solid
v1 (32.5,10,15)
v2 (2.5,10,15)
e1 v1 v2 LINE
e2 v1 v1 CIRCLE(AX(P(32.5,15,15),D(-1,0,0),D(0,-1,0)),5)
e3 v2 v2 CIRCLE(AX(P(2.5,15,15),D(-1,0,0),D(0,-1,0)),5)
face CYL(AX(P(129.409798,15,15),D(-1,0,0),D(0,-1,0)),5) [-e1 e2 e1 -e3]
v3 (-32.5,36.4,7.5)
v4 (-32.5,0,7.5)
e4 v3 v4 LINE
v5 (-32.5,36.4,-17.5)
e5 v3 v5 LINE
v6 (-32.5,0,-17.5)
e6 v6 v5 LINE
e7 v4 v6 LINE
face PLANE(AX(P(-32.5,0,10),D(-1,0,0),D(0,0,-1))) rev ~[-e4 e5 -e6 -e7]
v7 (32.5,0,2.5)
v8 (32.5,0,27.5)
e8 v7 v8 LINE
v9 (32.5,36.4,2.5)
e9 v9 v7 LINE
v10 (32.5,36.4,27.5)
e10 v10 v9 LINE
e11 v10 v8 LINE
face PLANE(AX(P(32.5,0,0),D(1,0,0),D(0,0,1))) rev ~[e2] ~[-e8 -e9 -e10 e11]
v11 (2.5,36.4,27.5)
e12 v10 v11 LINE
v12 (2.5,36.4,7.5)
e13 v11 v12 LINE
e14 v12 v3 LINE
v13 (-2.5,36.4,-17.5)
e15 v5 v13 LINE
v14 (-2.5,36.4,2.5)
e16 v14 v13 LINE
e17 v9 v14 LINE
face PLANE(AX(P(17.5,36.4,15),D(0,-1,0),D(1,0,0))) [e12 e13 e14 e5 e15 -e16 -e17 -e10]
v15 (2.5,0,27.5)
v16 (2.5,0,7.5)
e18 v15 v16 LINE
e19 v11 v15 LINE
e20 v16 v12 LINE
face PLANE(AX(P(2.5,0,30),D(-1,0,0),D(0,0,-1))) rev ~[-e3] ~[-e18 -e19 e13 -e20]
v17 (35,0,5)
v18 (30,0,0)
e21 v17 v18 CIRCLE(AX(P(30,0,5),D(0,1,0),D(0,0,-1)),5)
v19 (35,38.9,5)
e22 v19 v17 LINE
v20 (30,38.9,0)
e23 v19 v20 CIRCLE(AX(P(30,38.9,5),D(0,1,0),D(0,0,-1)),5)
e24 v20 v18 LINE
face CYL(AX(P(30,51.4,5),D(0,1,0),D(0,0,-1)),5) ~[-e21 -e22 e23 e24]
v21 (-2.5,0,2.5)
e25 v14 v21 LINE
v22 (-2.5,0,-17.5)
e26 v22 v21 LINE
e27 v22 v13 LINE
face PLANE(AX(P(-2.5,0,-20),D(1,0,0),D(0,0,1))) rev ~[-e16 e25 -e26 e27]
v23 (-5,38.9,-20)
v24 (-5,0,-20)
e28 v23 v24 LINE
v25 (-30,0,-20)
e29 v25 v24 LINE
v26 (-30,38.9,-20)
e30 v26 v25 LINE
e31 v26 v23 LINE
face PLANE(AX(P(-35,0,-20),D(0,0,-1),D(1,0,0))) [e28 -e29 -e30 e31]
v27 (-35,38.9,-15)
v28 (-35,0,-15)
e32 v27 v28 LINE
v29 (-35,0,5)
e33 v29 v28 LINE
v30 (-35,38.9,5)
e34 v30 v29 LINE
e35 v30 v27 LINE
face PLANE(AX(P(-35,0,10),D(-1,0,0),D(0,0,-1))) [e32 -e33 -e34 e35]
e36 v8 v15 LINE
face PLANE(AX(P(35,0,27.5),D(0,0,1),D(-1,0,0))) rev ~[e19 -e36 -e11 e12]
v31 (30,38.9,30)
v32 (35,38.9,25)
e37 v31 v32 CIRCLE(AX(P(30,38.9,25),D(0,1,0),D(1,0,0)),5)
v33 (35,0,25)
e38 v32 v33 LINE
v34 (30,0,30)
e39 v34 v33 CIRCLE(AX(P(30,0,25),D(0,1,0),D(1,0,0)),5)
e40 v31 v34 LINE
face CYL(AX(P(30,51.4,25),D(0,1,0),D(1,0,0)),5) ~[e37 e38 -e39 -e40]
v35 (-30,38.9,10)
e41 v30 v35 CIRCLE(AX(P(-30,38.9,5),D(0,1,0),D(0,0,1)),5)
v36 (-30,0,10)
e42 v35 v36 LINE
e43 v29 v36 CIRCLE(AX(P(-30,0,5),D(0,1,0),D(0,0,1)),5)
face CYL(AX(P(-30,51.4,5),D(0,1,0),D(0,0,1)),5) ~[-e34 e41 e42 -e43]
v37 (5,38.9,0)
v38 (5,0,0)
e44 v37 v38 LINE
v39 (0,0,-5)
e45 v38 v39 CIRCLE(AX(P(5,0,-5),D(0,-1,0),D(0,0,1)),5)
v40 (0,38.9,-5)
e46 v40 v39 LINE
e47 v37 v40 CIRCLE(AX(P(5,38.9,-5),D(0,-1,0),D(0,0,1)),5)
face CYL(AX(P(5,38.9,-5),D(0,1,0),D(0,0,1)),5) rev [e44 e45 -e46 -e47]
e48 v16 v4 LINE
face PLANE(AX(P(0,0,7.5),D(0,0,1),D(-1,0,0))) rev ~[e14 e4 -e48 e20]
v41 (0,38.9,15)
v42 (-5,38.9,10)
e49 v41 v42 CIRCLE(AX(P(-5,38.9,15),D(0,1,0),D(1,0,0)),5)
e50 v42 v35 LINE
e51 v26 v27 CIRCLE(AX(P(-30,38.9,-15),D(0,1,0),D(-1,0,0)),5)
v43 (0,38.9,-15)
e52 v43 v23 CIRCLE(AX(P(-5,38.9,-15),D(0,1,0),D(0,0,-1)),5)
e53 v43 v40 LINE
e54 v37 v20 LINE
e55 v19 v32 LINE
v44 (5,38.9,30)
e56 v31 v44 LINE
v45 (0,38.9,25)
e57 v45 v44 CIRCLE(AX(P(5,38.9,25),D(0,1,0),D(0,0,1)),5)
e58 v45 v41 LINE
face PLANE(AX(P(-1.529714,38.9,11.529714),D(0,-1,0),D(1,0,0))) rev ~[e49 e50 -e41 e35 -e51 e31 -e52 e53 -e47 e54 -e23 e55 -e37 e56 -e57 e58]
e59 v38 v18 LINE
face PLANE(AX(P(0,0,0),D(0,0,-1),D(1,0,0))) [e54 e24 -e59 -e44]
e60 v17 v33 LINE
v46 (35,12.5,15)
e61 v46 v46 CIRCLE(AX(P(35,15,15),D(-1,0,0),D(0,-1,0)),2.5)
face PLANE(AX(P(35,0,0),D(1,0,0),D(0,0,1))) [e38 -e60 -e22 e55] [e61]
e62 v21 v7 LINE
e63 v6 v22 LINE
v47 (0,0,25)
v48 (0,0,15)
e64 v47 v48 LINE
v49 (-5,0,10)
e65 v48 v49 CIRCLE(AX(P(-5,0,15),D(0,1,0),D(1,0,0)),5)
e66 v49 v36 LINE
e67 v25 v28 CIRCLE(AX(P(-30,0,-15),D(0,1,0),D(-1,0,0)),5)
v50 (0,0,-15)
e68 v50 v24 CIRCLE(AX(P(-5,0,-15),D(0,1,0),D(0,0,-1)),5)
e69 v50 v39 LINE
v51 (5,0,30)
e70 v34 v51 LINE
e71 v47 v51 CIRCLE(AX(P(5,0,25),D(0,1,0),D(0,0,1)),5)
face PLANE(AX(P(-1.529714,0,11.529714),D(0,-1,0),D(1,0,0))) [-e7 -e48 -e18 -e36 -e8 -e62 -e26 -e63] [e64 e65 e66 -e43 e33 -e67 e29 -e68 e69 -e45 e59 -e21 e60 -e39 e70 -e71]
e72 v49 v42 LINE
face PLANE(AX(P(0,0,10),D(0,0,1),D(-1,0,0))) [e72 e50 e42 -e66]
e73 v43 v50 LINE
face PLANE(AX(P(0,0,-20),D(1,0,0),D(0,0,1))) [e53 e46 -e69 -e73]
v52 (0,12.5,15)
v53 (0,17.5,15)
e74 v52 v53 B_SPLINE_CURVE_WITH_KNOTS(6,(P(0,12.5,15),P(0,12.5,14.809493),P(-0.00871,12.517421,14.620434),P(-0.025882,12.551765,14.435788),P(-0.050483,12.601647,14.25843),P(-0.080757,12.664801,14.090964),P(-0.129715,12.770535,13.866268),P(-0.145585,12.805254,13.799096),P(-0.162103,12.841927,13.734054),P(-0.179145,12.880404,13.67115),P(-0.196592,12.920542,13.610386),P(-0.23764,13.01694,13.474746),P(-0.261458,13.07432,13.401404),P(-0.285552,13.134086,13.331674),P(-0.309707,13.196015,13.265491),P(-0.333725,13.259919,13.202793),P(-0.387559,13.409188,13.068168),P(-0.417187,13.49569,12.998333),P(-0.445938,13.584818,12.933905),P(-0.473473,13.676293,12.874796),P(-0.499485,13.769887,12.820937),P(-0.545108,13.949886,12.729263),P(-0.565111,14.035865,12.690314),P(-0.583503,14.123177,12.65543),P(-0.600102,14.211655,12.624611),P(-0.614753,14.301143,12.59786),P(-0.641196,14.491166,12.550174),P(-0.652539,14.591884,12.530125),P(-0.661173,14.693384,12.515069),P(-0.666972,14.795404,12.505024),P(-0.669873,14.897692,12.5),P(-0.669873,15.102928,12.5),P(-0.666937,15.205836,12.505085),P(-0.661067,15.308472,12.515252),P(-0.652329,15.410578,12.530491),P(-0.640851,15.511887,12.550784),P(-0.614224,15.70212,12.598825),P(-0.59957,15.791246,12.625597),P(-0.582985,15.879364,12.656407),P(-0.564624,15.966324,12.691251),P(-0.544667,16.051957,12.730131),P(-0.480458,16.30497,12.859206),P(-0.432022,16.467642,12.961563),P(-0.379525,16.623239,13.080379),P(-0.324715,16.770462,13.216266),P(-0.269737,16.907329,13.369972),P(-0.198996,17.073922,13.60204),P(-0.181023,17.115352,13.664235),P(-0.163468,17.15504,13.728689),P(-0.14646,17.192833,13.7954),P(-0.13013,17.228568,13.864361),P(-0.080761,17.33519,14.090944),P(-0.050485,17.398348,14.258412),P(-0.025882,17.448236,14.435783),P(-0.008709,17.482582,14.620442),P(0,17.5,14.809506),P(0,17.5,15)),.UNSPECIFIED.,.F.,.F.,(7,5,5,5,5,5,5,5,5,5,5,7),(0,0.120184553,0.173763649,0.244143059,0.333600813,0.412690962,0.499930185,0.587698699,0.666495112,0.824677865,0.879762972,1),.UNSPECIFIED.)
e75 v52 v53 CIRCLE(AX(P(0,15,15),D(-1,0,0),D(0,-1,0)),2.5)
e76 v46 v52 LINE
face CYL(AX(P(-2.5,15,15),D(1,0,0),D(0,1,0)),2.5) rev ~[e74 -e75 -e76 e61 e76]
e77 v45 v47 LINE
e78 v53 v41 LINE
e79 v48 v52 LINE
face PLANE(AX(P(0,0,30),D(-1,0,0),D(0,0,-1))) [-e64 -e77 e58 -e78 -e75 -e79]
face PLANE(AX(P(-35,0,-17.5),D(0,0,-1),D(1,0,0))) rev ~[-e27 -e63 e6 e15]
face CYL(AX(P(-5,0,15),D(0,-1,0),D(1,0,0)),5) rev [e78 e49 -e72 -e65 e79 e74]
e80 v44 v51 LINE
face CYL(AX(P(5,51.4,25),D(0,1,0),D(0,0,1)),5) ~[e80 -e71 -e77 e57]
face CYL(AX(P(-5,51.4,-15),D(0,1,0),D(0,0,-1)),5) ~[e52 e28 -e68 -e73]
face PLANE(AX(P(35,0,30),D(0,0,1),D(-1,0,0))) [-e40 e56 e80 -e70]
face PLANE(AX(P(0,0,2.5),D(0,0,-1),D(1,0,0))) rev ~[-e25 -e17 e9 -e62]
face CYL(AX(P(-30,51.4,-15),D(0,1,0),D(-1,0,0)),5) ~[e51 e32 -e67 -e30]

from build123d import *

# Parameters (mm, degrees)
F1_DEPTH    = 38.9
F3_D        = 5
F4_T        = -2.5
F5_T1_DEPTH = 38.9
F5_T6_DEPTH = 38.9
F5_S7_R     = 2.5
F5_T8_DEPTH = 21
F5_T9_DEPTH = 63.9


# Not quite as in the source:
# - a fillet or chamfer that OpenCascade refuses, or shapes differently, is made with other operations: its cross-section is extruded or revolved along the edge and cut away or added


with BuildPart() as f1:
    # F0 (on Front) → F1 (new body)
    with BuildSketch(Plane.XZ):
        Polygon((0, 10), (0, 0), (35, 0), (35, 30), (0, 30), align=None)
        Polygon((0, -20), (0, 0), (0, 10), (-35, 10), (-35, -20), align=None)
    extrude(amount=-F1_DEPTH)

    # F3 (through all)
    with Locations(Plane.YZ.offset(35)):
        with Locations((15, 15)):
            Hole(F3_D / 2)

    # F4
    f4_openings = [f1.faces().sort_by_distance(p)[0] for p in [
        (0, 0, 5),
    ]]
    offset(amount=F4_T, openings=f4_openings, kind=Kind.INTERSECTION)

    # F5: fillet of radius 5 on 8 edges, made by hand

    # F5_s2 → F5_t1 (join)
    with BuildSketch(Plane.XZ.offset(-38.9)):
        with BuildLine():
            ThreePointArc((5, 0), (1.4644660941, -1.4644660941), (0, -5))
            Line((0, -5), (0, 0))
            Line((0, 0), (5, 0))
        make_face()
    extrude(amount=F5_T1_DEPTH)


with BuildPart() as f5_tool4:
    # F5_s5 → F5_t6 (new body)
    with BuildSketch(Plane.XZ):
        with BuildLine():
            ThreePointArc((0, 15), (-1.4644660941, 11.4644660941), (-5, 10))
            Line((-5, 10), (0, 10))
            Line((0, 10), (0, 15))
        make_face()
    extrude(amount=-F5_T6_DEPTH)

    # F5_s7 → F5_t8 (cut, symmetric)
    with BuildSketch(Plane.YZ.offset(-2.5)):
        with Locations((15, 15)):
            Circle(F5_S7_R)
    extrude(amount=F5_T8_DEPTH, both=True, mode=Mode.SUBTRACT)


with BuildPart() as f1_1:
    add(f1.part)

    # F5_t3: union F5_tool4
    add(f5_tool4.part)

    # F5_s10 → F5_t9 (cut)
    with BuildSketch(Plane.XZ.offset(-51.4)):
        with BuildLine():
            ThreePointArc((-30, 10), (-33.5355339059, 8.5355339059), (-35, 5))
            Line((-35, 5), (-35, 10))
            Line((-35, 10), (-30, 10))
        make_face()
        with BuildLine():
            ThreePointArc((-5, -20), (-1.4644660941, -18.5355339059), (0, -15))
            Line((0, -15), (0, -20))
            Line((0, -20), (-5, -20))
        make_face()
        with BuildLine():
            ThreePointArc((30, 0), (33.5355339059, 1.4644660941), (35, 5))
            Line((35, 5), (35, 0))
            Line((35, 0), (30, 0))
        make_face()
        with BuildLine():
            ThreePointArc((5, 30), (1.4644660941, 28.5355339059), (0, 25))
            Line((0, 25), (0, 30))
            Line((0, 30), (5, 30))
        make_face()
        with BuildLine():
            ThreePointArc((-35, -15), (-33.5355339059, -18.5355339059), (-30, -20))
            Line((-30, -20), (-35, -20))
            Line((-35, -20), (-35, -15))
        make_face()
        with BuildLine():
            ThreePointArc((35, 25), (33.5355339059, 28.5355339059), (30, 30))
            Line((30, 30), (35, 30))
            Line((35, 30), (35, 25))
        make_face()
    extrude(amount=F5_T9_DEPTH, mode=Mode.SUBTRACT)


solid = f1_1.part
